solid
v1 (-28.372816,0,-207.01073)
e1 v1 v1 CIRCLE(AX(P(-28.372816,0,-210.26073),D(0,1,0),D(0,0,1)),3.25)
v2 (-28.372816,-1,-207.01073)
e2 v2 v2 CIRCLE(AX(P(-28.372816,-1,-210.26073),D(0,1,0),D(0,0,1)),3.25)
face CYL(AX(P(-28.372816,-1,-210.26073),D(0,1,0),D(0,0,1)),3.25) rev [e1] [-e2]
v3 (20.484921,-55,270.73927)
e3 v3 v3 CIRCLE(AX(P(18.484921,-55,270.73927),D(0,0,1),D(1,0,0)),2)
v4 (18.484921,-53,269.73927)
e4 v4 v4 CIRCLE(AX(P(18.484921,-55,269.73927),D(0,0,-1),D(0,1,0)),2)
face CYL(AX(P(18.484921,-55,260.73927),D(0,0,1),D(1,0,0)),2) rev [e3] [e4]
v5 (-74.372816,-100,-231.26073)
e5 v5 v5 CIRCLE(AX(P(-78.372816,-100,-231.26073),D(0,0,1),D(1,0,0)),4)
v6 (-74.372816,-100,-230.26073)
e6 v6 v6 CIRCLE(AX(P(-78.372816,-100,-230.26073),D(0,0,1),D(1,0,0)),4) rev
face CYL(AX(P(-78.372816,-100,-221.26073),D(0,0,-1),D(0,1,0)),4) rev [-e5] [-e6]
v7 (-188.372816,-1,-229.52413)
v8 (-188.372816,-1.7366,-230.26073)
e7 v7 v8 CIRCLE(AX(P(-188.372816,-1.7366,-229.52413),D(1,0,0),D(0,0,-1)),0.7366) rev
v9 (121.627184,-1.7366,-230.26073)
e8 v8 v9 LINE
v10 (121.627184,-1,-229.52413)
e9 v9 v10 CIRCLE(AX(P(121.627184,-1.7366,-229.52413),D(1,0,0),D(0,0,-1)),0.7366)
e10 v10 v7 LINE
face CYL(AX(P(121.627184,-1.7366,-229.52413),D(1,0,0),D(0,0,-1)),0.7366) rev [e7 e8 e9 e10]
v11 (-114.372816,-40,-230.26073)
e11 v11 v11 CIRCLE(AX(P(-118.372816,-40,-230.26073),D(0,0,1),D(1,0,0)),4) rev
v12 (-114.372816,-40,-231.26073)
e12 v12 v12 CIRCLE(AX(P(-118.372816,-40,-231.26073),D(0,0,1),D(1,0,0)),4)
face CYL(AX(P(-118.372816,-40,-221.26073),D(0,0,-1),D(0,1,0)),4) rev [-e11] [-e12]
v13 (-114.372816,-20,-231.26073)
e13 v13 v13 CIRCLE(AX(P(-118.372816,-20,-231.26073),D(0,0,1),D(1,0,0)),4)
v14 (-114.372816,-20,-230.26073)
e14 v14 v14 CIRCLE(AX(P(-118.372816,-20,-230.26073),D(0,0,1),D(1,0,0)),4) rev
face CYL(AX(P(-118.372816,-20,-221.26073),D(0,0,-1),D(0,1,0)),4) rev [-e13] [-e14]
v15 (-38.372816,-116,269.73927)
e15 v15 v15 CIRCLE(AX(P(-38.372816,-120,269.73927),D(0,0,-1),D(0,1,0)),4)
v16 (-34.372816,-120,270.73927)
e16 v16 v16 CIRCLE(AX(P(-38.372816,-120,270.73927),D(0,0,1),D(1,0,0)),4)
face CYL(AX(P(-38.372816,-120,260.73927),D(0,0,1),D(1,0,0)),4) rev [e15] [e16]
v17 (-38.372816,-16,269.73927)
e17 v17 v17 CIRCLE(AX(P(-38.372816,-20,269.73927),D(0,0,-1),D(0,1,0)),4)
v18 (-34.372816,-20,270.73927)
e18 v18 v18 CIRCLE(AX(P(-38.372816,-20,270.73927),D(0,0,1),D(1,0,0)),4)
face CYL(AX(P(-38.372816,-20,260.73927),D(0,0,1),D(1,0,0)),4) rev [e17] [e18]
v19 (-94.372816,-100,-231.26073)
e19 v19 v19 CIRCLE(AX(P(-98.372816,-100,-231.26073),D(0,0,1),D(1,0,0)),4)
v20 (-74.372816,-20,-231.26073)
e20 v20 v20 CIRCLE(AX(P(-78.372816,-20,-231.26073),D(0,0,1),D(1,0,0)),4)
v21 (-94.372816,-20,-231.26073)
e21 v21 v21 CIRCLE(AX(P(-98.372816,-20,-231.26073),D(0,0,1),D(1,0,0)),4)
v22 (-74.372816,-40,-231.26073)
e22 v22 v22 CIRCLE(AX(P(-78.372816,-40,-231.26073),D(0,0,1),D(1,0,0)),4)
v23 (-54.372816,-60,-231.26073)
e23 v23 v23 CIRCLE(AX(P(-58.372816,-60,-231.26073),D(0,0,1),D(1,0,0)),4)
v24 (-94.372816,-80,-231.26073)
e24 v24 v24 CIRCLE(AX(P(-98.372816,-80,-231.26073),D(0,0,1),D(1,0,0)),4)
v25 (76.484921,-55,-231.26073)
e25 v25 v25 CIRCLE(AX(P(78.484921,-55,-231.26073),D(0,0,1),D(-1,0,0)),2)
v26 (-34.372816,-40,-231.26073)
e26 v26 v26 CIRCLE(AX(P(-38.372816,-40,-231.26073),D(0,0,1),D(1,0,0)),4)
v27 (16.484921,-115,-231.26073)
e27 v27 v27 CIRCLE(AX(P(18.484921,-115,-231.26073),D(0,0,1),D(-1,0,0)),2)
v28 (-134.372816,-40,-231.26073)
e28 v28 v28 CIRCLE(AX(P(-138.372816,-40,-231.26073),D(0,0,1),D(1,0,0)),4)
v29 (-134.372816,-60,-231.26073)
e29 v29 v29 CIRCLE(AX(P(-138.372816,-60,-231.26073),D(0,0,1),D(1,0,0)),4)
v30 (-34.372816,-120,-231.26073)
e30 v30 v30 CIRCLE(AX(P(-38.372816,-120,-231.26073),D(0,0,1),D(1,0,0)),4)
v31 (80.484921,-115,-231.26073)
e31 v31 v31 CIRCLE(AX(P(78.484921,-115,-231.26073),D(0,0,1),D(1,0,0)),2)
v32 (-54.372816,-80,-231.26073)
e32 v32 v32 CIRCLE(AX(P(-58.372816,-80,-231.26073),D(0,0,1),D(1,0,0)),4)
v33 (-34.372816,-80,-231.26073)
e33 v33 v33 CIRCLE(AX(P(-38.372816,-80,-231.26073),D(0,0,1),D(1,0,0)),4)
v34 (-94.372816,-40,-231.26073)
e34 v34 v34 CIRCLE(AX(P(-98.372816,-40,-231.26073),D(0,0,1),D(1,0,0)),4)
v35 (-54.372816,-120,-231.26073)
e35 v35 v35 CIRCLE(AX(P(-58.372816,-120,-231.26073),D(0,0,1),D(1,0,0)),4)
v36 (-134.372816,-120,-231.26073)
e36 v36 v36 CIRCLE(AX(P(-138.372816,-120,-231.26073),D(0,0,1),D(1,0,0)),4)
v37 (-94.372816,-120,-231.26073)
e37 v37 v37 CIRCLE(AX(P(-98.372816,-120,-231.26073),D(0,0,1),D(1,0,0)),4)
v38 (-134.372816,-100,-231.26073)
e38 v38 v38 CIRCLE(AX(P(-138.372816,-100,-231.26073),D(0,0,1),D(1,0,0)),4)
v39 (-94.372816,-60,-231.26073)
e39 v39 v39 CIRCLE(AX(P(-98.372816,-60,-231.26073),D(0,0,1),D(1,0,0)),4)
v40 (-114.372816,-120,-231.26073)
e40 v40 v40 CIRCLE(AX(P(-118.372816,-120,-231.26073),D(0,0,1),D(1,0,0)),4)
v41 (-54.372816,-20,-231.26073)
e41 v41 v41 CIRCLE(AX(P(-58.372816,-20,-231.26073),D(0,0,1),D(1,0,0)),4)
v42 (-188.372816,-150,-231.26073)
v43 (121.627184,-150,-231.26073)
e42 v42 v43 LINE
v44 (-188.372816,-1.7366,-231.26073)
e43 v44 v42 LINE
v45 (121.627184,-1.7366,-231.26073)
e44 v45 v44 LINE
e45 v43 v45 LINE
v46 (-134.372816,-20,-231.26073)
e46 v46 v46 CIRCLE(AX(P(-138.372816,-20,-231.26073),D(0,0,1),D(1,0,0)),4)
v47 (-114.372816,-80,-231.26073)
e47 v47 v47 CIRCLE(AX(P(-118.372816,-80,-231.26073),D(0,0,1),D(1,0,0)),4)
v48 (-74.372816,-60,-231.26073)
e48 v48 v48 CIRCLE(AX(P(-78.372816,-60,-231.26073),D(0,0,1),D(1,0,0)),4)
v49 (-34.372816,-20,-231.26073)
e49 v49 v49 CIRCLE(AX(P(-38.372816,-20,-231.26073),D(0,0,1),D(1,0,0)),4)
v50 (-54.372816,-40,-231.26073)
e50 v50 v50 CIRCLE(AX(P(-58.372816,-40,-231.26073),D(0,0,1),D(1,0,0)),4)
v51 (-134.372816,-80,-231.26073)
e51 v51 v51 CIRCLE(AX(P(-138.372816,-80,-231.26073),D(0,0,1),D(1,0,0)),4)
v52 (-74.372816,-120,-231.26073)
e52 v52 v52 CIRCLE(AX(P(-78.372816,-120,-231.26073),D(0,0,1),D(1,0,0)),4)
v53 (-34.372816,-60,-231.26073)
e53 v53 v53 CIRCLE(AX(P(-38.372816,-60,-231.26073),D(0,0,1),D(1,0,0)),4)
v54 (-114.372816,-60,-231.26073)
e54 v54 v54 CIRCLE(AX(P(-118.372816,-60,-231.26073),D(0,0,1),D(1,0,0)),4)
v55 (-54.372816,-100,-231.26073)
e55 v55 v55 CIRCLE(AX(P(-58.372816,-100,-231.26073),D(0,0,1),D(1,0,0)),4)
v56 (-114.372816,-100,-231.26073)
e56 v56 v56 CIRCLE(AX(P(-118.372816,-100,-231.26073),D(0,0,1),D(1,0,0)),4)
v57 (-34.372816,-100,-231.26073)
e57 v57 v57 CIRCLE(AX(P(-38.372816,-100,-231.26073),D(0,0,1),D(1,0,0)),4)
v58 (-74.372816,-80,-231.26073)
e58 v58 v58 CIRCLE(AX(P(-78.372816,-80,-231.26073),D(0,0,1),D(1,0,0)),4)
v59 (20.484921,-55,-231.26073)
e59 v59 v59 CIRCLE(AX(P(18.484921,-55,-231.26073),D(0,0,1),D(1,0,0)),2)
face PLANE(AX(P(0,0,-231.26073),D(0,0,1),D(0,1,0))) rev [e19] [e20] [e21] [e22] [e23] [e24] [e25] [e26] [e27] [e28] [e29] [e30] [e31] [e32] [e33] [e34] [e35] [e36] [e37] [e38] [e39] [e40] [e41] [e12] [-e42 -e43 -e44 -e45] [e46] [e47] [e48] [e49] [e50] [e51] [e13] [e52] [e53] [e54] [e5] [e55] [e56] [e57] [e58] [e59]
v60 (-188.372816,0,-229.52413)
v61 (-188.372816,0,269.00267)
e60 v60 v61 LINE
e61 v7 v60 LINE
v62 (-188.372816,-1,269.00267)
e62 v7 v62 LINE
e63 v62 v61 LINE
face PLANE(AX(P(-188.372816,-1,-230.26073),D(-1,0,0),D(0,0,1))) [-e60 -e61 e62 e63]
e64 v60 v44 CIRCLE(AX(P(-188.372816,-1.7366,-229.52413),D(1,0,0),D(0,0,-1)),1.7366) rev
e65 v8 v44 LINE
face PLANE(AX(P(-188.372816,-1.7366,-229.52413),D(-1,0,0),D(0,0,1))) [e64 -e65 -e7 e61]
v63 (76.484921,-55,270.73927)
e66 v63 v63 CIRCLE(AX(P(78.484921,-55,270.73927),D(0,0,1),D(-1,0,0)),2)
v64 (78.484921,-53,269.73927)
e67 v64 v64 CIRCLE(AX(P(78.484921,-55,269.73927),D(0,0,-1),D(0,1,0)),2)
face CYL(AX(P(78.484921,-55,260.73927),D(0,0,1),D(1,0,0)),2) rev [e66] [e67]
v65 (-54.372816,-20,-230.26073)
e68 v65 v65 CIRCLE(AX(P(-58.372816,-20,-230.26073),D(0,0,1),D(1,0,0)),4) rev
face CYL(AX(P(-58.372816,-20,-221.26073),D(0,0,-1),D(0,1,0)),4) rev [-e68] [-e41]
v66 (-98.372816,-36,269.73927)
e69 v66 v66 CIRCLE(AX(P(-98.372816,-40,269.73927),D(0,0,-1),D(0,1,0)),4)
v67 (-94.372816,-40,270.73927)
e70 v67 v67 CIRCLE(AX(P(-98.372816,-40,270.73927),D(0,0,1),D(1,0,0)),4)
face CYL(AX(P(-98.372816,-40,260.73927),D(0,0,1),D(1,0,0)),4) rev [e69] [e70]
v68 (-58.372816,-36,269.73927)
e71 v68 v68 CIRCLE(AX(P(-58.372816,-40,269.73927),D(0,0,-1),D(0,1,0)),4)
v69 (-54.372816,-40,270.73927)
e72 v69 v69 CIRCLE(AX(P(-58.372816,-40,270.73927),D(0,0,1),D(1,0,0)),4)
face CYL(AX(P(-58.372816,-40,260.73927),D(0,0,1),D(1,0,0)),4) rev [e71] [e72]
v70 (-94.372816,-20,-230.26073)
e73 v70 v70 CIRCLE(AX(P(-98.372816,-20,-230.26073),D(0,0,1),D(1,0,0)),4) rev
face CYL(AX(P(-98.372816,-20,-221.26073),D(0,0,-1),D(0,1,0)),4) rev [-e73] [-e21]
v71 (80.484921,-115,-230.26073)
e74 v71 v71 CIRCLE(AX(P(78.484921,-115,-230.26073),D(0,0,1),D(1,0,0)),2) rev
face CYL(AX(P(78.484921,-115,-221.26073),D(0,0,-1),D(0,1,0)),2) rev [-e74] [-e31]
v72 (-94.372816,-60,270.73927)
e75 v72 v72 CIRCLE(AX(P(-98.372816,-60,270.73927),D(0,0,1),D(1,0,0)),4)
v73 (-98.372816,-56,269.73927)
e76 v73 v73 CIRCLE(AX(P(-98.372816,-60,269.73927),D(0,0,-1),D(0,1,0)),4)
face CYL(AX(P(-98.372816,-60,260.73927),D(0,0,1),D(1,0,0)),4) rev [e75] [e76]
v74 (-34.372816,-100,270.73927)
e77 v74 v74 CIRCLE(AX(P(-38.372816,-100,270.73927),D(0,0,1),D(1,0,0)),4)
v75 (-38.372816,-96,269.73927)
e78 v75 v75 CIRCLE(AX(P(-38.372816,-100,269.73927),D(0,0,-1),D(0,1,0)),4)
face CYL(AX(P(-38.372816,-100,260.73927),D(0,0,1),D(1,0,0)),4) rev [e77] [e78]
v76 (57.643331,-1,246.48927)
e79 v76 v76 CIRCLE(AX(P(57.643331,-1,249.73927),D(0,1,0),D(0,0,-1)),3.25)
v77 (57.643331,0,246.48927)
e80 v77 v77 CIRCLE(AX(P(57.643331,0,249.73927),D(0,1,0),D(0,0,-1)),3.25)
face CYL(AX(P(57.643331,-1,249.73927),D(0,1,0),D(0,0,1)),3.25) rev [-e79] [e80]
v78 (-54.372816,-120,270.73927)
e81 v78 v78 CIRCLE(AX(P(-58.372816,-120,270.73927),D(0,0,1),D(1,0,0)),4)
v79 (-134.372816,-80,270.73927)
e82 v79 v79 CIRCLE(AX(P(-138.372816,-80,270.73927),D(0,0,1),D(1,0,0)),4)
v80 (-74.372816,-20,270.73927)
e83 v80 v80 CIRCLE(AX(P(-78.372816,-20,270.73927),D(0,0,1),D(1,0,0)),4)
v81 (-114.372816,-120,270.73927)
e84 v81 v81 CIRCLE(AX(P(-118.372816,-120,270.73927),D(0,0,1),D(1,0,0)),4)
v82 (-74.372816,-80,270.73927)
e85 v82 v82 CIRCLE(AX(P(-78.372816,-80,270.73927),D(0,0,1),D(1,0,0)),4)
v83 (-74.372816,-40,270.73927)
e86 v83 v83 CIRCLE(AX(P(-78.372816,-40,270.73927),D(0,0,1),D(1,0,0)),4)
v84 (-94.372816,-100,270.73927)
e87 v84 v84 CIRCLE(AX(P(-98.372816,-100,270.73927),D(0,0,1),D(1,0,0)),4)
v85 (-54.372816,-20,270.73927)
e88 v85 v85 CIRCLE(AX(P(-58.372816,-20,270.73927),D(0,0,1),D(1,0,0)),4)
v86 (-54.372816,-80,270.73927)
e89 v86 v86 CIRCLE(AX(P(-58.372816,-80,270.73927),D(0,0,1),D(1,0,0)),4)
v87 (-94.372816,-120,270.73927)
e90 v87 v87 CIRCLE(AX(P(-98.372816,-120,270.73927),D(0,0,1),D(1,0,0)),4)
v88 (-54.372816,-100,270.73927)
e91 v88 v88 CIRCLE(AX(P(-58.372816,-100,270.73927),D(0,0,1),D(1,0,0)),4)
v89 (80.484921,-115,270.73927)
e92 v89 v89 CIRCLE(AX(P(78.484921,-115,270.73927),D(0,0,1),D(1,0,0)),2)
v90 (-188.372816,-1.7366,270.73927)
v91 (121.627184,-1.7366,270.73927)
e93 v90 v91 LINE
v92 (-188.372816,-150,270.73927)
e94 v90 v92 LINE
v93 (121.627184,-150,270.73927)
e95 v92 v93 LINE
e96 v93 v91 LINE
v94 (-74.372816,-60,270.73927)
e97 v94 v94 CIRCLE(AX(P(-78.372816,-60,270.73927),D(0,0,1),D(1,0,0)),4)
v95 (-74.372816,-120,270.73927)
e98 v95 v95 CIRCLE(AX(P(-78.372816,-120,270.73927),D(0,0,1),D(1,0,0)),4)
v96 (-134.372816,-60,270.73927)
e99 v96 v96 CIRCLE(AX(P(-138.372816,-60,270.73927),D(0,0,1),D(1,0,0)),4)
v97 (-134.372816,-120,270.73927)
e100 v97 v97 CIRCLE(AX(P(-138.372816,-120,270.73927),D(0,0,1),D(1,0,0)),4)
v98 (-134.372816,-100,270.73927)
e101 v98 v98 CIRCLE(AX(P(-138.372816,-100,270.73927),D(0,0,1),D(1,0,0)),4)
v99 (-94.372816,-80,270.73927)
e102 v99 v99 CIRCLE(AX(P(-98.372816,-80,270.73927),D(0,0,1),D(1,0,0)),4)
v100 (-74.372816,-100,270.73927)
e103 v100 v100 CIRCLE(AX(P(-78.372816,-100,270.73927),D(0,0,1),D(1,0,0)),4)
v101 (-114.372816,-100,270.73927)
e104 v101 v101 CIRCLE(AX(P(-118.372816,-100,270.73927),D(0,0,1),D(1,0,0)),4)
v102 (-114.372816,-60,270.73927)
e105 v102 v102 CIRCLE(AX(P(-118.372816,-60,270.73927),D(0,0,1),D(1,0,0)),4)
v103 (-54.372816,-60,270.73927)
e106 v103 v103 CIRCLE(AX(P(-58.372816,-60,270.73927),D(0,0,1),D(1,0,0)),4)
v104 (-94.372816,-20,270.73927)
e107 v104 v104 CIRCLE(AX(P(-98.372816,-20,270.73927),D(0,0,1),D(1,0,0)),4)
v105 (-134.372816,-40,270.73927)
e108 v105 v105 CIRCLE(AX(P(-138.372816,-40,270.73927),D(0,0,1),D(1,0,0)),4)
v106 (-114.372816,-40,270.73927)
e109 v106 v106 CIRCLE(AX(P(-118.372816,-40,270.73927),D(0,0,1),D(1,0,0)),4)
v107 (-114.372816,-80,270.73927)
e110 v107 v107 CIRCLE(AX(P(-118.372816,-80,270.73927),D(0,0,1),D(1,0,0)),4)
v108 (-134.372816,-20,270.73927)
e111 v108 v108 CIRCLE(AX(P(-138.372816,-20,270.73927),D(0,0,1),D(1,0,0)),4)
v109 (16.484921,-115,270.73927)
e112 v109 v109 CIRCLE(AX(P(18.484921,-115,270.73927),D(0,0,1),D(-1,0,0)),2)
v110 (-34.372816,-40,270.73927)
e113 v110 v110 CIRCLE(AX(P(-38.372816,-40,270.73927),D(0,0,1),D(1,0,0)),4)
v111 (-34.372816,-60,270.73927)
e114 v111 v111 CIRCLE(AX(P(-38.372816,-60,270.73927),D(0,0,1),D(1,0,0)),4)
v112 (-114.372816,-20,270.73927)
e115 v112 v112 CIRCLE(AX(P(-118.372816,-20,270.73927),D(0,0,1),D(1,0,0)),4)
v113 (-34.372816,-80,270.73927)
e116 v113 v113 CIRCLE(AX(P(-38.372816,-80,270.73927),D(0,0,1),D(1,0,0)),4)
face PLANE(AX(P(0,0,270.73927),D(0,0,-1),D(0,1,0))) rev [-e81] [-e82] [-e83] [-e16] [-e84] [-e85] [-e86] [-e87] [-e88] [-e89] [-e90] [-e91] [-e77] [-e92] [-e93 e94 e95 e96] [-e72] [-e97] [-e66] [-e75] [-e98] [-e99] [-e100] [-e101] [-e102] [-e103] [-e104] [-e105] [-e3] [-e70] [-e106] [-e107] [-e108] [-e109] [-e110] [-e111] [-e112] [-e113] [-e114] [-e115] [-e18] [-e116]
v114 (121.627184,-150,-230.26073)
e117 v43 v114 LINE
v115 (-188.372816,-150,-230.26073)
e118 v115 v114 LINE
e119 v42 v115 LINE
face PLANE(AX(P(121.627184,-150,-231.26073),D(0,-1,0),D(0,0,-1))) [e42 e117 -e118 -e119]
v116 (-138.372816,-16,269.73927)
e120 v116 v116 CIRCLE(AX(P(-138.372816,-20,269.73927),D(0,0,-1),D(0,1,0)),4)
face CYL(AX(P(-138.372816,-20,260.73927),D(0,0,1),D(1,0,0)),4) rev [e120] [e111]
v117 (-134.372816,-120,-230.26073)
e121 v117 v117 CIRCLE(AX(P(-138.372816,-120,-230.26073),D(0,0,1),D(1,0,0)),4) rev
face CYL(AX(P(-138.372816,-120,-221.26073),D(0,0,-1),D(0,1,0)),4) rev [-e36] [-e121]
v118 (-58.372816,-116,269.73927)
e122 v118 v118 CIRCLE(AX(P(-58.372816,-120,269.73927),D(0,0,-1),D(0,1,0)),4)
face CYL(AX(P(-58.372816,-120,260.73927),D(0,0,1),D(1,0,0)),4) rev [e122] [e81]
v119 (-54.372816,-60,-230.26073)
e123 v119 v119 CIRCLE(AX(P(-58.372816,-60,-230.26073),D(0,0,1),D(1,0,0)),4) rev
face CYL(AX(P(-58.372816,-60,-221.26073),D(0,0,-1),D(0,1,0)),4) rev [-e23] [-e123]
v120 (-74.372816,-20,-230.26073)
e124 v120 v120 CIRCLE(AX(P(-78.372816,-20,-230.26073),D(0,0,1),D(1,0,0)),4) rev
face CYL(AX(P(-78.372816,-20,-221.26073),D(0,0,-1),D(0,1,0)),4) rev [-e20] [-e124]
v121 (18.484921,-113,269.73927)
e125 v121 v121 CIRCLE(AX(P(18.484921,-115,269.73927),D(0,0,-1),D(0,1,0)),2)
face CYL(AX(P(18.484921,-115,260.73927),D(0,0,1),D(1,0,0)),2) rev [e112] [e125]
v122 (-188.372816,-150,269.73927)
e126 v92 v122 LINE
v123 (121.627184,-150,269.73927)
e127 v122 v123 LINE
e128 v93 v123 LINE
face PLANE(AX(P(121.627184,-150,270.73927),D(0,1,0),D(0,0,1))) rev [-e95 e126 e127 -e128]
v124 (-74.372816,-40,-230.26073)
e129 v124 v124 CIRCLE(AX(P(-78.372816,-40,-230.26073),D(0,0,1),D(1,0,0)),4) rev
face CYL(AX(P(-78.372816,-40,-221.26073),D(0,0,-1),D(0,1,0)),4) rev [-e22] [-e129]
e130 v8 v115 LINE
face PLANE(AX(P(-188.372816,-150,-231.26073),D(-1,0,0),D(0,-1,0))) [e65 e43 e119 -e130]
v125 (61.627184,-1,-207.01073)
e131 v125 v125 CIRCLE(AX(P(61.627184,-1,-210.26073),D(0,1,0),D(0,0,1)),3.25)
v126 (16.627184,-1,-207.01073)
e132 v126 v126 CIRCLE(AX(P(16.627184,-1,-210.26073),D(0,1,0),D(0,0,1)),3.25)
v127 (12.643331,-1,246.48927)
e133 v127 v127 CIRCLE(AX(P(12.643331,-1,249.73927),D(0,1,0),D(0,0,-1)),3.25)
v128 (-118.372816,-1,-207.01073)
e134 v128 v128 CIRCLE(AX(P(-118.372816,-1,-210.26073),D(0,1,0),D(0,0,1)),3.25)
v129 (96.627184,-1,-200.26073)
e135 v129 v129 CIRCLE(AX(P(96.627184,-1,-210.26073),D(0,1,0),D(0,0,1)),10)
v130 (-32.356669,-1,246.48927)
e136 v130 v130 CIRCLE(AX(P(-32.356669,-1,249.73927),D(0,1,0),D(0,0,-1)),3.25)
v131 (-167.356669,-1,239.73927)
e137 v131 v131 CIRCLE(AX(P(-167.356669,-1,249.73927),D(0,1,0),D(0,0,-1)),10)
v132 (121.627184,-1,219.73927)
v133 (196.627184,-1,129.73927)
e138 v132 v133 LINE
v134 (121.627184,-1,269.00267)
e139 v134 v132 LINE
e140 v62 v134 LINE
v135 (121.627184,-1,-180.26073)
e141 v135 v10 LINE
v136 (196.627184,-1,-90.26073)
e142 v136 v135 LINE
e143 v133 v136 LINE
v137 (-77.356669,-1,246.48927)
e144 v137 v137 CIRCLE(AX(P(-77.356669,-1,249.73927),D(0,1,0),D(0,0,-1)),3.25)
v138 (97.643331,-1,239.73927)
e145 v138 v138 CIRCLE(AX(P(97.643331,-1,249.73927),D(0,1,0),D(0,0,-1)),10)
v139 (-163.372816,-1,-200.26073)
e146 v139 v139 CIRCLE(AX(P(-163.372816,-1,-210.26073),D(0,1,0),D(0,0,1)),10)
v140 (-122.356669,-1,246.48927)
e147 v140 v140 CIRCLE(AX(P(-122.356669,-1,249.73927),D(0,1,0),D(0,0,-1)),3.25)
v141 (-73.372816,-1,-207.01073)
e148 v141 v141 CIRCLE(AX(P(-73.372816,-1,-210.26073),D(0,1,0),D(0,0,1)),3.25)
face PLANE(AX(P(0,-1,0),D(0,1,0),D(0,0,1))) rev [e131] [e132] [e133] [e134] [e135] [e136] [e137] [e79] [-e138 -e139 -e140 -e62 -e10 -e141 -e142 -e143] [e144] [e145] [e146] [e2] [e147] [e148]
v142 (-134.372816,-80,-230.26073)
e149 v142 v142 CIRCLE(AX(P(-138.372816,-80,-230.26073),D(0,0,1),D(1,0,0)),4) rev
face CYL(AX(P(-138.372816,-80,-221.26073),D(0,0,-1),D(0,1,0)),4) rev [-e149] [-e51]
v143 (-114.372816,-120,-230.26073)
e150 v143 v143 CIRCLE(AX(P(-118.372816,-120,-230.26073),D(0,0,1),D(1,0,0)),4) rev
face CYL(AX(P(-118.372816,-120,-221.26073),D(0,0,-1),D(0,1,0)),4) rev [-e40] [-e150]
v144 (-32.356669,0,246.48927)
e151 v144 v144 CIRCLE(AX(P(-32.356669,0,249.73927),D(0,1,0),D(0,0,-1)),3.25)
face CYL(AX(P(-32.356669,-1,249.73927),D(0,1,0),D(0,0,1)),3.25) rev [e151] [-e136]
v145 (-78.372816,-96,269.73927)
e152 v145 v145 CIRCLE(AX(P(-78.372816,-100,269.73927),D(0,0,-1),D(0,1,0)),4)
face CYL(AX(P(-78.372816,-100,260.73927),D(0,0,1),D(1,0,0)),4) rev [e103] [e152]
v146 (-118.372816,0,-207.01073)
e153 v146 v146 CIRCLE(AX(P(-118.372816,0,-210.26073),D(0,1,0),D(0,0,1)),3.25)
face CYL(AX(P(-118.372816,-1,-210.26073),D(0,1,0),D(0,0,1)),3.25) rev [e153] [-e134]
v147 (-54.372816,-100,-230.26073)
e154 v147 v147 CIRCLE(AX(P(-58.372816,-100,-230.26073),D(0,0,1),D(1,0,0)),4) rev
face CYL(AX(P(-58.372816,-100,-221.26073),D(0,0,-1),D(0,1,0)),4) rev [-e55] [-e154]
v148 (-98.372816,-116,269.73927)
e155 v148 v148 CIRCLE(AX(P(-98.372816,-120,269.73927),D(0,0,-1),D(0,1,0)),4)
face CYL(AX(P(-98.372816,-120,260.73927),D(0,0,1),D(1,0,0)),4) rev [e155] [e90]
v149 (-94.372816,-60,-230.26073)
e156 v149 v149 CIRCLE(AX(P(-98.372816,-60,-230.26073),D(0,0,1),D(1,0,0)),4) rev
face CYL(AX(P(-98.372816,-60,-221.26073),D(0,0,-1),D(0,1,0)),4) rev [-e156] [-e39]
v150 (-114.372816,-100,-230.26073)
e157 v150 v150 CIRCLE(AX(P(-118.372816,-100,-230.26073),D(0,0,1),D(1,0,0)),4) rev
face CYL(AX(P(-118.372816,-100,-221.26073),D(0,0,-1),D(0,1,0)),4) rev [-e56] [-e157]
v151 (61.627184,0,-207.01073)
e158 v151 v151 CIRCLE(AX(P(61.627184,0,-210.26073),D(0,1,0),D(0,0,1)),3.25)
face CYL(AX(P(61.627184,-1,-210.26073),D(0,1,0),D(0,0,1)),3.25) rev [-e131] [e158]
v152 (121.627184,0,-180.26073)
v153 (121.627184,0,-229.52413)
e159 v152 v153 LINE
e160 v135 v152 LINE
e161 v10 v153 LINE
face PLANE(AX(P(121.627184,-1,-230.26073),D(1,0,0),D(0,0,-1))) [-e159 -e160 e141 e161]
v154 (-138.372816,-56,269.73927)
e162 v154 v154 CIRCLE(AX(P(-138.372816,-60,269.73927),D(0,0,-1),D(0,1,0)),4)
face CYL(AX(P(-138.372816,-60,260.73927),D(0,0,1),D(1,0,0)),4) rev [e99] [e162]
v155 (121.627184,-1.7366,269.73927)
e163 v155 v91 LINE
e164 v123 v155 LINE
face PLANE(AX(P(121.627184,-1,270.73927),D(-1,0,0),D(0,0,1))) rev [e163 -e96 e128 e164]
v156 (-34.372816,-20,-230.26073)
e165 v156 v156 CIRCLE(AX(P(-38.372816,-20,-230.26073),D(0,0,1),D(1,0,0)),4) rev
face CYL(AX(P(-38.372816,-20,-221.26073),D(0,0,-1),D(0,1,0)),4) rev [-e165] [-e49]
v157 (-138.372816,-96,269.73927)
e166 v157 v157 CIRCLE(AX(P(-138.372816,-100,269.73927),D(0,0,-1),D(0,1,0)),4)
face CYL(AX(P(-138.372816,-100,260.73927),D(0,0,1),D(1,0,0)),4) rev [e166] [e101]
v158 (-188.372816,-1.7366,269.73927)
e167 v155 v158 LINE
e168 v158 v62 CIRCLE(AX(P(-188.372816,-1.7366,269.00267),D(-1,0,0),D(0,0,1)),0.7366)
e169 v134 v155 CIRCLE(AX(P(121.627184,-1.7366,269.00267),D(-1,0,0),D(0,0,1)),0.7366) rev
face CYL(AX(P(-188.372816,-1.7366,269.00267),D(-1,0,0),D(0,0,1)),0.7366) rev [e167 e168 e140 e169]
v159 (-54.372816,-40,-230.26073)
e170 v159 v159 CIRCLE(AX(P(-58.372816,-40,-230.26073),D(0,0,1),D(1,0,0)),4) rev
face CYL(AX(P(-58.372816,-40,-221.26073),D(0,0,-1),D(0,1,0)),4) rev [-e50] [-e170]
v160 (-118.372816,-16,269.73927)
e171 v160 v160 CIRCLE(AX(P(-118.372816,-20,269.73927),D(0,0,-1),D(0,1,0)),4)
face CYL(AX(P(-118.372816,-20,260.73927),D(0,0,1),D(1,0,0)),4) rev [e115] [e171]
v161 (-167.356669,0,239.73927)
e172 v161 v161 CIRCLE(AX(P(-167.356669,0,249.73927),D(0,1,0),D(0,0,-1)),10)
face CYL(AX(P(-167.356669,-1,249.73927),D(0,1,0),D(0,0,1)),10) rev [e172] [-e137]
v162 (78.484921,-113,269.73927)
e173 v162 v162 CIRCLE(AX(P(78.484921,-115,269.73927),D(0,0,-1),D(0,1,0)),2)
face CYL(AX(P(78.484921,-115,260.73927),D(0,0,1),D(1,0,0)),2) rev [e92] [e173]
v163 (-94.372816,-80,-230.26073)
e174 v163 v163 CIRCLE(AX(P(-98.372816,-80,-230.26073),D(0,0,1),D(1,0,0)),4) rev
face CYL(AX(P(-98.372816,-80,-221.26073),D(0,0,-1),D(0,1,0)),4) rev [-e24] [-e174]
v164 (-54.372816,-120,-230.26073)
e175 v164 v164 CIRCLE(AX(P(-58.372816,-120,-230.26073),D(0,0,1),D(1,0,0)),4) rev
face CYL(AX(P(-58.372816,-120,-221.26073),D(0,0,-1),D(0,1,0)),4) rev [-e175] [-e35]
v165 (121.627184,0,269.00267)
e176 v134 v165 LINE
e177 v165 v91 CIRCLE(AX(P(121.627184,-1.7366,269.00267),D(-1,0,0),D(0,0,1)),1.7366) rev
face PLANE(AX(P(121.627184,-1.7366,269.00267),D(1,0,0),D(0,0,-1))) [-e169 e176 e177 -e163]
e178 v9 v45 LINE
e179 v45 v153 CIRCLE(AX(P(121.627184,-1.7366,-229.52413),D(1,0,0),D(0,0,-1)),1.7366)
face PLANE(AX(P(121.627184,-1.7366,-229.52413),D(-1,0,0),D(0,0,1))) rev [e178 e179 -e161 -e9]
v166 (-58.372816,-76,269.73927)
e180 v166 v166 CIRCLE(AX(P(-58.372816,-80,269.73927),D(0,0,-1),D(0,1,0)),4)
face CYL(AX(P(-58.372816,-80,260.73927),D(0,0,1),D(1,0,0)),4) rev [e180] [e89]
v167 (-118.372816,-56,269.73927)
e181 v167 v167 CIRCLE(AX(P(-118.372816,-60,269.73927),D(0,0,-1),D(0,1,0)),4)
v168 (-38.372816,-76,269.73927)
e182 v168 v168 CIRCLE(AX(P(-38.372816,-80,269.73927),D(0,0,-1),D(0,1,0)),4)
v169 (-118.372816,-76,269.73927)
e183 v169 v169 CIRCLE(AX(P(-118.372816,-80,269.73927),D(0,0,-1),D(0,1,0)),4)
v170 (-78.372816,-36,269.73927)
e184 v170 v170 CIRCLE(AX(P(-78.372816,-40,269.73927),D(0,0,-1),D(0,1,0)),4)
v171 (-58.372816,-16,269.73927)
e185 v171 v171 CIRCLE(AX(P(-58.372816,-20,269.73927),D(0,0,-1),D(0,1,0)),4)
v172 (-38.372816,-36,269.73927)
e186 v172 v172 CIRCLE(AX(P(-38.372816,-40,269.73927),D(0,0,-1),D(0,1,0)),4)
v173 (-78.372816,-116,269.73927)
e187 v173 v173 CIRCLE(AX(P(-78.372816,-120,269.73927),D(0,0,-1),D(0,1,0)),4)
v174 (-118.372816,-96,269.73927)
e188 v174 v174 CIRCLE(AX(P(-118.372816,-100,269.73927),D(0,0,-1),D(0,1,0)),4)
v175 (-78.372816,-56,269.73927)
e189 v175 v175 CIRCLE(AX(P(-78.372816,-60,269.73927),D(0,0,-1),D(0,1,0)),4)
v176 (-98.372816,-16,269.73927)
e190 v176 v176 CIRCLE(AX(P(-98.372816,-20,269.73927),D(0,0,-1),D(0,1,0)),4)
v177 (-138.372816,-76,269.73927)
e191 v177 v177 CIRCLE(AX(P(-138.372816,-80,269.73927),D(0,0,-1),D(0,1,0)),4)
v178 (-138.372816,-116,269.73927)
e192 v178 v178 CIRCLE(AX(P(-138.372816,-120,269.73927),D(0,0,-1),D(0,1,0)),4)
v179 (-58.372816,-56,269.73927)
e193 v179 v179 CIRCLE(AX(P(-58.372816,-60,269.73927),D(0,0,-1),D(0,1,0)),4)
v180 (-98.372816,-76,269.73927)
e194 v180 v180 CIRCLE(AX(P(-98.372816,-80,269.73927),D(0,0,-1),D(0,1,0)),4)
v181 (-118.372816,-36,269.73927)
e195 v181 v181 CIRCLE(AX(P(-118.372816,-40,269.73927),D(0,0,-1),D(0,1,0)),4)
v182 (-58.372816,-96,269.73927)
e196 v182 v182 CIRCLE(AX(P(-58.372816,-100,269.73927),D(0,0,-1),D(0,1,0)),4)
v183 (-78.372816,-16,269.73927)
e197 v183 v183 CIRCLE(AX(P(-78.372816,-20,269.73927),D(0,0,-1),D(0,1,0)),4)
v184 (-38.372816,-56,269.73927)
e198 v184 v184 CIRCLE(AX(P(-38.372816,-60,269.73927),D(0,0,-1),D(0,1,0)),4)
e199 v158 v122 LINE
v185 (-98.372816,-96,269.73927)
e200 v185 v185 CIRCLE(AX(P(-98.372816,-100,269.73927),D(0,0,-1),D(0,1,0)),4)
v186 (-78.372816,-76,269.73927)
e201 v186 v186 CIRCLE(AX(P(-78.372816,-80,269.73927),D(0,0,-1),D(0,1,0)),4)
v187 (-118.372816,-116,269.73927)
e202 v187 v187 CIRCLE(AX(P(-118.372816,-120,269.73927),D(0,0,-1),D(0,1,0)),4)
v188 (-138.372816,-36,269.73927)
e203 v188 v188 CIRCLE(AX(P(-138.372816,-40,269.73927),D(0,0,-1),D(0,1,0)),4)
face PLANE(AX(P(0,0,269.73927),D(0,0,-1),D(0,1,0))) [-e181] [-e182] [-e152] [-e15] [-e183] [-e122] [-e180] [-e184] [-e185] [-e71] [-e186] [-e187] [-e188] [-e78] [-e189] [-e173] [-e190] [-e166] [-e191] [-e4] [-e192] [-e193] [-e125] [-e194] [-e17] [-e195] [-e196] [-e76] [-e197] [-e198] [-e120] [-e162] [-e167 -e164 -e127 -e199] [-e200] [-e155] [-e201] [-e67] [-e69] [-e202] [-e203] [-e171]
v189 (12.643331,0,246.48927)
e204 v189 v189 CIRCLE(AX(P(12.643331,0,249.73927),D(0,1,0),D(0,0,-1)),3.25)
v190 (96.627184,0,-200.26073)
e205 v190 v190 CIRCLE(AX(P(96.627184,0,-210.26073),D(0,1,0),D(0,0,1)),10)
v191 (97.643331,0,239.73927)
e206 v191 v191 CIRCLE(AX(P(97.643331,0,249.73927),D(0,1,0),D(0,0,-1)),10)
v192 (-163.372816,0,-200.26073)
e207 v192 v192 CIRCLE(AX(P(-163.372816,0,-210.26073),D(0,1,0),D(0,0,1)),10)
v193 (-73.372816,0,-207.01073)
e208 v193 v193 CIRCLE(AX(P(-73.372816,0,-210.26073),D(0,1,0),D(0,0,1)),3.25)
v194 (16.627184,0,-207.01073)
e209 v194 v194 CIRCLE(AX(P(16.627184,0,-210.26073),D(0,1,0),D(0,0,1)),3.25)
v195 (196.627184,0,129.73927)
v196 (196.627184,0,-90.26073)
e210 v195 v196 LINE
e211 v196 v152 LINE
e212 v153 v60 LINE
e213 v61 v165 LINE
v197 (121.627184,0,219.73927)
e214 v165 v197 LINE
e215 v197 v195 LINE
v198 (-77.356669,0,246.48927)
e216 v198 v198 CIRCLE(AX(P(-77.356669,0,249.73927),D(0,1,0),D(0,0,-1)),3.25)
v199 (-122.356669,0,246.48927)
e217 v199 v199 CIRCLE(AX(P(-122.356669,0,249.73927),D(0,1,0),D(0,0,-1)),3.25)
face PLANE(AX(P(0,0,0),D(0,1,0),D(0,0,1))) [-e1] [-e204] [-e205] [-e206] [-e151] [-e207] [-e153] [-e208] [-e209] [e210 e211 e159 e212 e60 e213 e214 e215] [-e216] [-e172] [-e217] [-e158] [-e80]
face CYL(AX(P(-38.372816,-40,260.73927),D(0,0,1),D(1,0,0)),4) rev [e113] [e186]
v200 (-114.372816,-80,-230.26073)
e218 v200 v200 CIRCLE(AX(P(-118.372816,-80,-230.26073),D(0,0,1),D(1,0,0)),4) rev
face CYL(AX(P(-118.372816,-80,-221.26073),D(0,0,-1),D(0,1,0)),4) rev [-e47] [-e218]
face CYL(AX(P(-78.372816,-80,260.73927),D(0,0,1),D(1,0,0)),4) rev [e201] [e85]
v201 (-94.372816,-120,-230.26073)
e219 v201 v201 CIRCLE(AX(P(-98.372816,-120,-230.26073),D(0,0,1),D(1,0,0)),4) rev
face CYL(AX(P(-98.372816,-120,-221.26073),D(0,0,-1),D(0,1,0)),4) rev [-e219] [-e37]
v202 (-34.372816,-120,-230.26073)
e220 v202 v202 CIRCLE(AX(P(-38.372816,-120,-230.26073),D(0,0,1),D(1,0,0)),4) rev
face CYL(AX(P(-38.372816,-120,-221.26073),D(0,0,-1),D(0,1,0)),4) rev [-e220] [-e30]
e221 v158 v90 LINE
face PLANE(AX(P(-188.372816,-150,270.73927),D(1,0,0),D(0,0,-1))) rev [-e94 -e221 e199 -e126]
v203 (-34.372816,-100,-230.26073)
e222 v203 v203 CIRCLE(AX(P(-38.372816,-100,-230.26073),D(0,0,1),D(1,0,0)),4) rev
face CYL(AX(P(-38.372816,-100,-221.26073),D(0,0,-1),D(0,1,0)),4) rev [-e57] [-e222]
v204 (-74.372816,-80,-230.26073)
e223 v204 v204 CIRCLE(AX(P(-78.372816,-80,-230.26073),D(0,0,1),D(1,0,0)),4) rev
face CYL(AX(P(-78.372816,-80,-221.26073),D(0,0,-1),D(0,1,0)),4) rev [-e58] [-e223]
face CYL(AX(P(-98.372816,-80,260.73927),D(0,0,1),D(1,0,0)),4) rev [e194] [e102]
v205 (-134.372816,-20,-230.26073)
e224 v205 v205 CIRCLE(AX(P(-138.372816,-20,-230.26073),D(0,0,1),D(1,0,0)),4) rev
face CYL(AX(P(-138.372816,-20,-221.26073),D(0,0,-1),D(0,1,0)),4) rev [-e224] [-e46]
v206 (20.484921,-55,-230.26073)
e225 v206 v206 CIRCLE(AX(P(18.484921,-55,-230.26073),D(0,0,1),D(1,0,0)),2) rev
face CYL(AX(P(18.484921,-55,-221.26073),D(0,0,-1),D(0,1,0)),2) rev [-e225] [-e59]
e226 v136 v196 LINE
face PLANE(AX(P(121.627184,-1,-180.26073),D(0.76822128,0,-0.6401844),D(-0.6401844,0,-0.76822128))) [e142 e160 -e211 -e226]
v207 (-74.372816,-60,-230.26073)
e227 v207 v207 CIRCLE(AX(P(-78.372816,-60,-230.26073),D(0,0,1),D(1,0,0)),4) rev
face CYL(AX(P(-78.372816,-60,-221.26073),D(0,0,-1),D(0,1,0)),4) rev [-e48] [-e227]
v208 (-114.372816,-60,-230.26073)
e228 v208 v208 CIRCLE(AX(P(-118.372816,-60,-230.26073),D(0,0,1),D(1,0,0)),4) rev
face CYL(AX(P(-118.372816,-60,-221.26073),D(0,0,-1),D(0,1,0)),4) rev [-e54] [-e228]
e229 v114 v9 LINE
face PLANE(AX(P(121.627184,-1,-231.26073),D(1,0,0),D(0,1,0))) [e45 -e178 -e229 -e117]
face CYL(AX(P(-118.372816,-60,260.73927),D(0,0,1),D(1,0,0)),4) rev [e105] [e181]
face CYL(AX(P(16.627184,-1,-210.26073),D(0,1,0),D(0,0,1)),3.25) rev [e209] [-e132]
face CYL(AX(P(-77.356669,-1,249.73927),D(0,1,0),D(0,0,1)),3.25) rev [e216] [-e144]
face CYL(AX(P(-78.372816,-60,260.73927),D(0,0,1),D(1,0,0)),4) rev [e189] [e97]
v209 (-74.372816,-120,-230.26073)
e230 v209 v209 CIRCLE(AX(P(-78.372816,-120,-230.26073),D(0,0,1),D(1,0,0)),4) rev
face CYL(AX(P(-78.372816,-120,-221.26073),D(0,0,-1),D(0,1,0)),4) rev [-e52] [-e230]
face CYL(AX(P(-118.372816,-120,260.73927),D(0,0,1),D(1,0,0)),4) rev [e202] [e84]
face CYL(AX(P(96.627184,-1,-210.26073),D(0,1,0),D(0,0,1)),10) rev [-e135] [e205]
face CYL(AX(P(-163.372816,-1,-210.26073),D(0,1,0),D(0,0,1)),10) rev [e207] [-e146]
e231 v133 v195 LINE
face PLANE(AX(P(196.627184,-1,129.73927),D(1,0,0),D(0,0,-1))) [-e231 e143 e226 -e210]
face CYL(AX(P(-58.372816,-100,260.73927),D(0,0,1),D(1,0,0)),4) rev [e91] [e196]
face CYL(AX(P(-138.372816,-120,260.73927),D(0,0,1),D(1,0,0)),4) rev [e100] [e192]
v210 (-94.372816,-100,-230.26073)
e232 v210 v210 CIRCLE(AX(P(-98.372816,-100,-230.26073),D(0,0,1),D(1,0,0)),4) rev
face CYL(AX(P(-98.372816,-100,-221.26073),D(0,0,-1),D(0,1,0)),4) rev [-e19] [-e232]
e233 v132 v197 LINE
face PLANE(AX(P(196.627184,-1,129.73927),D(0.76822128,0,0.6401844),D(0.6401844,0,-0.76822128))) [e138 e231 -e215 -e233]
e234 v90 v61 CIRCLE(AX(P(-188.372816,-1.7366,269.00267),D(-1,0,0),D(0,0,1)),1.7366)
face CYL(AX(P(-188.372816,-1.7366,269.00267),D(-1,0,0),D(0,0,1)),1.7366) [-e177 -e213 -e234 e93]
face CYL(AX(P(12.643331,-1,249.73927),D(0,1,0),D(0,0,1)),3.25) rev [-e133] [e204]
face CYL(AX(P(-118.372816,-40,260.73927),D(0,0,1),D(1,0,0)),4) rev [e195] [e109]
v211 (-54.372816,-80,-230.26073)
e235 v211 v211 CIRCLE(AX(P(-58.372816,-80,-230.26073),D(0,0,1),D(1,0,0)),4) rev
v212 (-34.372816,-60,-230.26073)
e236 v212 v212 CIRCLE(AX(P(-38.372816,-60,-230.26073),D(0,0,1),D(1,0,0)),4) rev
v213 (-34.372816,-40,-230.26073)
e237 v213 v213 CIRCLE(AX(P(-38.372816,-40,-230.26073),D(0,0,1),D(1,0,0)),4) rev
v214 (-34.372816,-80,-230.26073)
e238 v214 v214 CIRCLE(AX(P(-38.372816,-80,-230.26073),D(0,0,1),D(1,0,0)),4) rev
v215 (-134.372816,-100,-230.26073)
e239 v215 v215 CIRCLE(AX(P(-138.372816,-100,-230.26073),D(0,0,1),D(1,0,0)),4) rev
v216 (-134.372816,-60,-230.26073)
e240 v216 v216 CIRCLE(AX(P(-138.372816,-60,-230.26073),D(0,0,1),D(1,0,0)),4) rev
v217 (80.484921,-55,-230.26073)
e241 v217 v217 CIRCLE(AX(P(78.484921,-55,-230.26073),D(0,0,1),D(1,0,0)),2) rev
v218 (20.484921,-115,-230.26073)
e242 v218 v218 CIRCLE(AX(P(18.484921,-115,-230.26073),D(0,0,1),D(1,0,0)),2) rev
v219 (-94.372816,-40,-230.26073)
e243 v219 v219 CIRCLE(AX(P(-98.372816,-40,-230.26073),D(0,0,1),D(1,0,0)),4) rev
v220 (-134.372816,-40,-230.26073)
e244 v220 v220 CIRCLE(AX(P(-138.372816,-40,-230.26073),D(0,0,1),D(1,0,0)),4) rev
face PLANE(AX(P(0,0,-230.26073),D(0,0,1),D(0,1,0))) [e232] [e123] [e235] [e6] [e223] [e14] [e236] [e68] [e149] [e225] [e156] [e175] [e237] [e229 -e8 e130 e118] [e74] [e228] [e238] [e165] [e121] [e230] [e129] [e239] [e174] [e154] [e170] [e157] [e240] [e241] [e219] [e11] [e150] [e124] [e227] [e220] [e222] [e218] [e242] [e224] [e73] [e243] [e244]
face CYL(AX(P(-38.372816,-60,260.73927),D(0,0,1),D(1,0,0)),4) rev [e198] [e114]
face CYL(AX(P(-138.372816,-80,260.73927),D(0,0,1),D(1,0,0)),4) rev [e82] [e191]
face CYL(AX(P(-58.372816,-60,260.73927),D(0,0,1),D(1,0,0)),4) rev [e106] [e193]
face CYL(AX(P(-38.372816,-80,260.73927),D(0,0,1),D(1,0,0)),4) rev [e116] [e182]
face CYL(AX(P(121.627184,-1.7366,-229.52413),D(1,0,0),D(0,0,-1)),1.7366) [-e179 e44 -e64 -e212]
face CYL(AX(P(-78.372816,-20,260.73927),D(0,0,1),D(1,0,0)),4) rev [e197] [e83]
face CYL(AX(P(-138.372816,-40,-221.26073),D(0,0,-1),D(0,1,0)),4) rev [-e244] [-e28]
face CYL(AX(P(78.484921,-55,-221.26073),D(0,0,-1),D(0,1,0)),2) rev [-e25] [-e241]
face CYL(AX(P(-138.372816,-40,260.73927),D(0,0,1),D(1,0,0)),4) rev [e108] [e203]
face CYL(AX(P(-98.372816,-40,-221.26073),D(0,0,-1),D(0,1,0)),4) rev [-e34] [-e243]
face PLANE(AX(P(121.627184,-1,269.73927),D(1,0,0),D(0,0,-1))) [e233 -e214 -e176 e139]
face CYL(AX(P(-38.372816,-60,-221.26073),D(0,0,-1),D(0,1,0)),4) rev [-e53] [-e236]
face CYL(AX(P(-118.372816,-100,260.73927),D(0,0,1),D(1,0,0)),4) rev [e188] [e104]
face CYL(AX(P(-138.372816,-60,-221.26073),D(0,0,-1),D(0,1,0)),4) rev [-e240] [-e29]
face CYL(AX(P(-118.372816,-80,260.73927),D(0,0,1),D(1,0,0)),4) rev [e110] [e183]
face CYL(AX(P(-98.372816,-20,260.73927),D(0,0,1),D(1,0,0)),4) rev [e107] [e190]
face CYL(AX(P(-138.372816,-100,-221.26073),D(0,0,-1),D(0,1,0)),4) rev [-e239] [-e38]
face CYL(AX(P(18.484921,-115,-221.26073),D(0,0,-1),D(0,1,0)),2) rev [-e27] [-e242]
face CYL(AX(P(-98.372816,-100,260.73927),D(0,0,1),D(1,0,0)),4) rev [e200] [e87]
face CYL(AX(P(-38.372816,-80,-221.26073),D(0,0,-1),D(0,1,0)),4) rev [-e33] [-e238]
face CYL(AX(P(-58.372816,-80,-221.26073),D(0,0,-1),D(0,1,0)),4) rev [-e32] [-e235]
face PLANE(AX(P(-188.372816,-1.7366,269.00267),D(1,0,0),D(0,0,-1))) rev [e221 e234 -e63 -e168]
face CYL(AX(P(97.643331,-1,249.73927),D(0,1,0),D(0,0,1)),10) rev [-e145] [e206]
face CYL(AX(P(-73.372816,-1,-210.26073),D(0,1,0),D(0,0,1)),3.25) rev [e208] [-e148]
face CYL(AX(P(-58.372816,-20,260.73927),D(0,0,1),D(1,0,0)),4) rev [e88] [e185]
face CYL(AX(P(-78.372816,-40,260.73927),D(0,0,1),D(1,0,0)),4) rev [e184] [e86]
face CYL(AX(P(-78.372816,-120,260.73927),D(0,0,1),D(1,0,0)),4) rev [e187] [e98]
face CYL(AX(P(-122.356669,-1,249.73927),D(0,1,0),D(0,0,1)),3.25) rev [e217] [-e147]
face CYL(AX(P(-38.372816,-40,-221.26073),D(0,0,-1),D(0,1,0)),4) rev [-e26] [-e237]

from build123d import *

# Parameters (mm, degrees)
SKETCH6_R                    = 10
SKETCH6_R_2                  = 3.25
BASE_FLANGE2_DEPTH           = 1
EDGE_FLANGE1_STRIP_W         = 5.4732
EDGE_FLANGE1_STRIP_H         = 1
EDGE_FLANGE1_STRIP_CUT_DEPTH = 310
EDGE_FLANGE1_DEPTH           = 310
SKETCH23_R                   = 4
CUT_EXTRUDE1_DEPTH           = 10
SKETCH24_R                   = 2
CUT_EXTRUDE2_DEPTH           = 10


# Sheet-metal steps are written as plain solids
with BuildPart() as part:
    # Sketch6 → Base-Flange2 (new body)
    with BuildSketch(Plane(origin=(0, 0, 0), x_dir=(1, 0, 0), z_dir=(0, 1, 0))):
        Polygon((-188.372816417, 230.260729543), (-188.372816417, -269.739270457), (121.627183583, -269.739270457), (121.627183583, -219.739270457), (196.627183583, -129.739270457), (196.627183583, 90.260729543), (121.627183583, 180.260729543), (121.627183583, 230.260729543), align=None)
        with Locations(Location((-163.372816417, 210.260729543, 0), (0, 0, 270))):
            Circle(SKETCH6_R, mode=Mode.SUBTRACT)
        with Locations(Location((-118.372816417, 210.260729543, 0), (0, 0, 270))):
            Circle(SKETCH6_R_2, mode=Mode.SUBTRACT)
        with Locations(Location((-73.372816417, 210.260729543, 0), (0, 0, 270))):
            Circle(SKETCH6_R_2, mode=Mode.SUBTRACT)
        with Locations(Location((-28.372816417, 210.260729543, 0), (0, 0, 270))):
            Circle(SKETCH6_R_2, mode=Mode.SUBTRACT)
        with Locations(Location((16.627183583, 210.260729543, 0), (0, 0, 270))):
            Circle(SKETCH6_R_2, mode=Mode.SUBTRACT)
        with Locations(Location((96.627183583, 210.260729543, 0), (0, 0, 270))):
            Circle(SKETCH6_R, mode=Mode.SUBTRACT)
        with Locations(Location((61.627183583, 210.260729543, 0), (0, 0, 270))):
            Circle(SKETCH6_R_2, mode=Mode.SUBTRACT)
        with Locations(Location((-167.356668965, -249.739270457, 0), (0, 0, 90))):
            Circle(SKETCH6_R, mode=Mode.SUBTRACT)
        with Locations(Location((-122.356668965, -249.739270457, 0), (0, 0, 90))):
            Circle(SKETCH6_R_2, mode=Mode.SUBTRACT)
        with Locations(Location((-77.356668965, -249.739270457, 0), (0, 0, 90))):
            Circle(SKETCH6_R_2, mode=Mode.SUBTRACT)
        with Locations(Location((-32.356668965, -249.739270457, 0), (0, 0, 90))):
            Circle(SKETCH6_R_2, mode=Mode.SUBTRACT)
        with Locations(Location((12.643331035, -249.739270457, 0), (0, 0, 90))):
            Circle(SKETCH6_R_2, mode=Mode.SUBTRACT)
        with Locations(Location((97.643331035, -249.739270457, 0), (0, 0, 90))):
            Circle(SKETCH6_R, mode=Mode.SUBTRACT)
        with Locations(Location((57.643331035, -249.739270457, 0), (0, 0, 90))):
            Circle(SKETCH6_R_2, mode=Mode.SUBTRACT)
    extrude(amount=-BASE_FLANGE2_DEPTH)

    # Edge-Flange1 strip (across the edge) → Edge-Flange1 strip cut (cut)
    with BuildSketch(Plane(origin=(121.627183583, -1, 269.739270457), x_dir=(0, 0, -1), z_dir=(-1, 0, 0))):
        with Locations((-2, -0.5)):
            Rectangle(EDGE_FLANGE1_STRIP_W, EDGE_FLANGE1_STRIP_H)
    edge_flange1_strip_cut = extrude(amount=EDGE_FLANGE1_STRIP_CUT_DEPTH, mode=Mode.SUBTRACT)

    # Edge-Flange1 section (across the edge) → Edge-Flange1 (add)
    with BuildSketch(Plane(origin=(121.627183583, -1, 269.739270457), x_dir=(0, 0, -1), z_dir=(-1, 0, 0))):
        with BuildLine():
            Line((-1, 0.7366), (-1, 149))
            Line((-1, 149), (0, 149))
            Line((0, 149), (0, 0.7366))
            ThreePointArc((0, 0.7366), (0.215745145, 0.215745145), (0.7366, 0))
            Line((0.7366, 0), (0.7366, -1))
            ThreePointArc((0.7366, -1), (-0.491361636, -0.491361636), (-1, 0.7366))
        make_face()
    edge_flange1 = extrude(amount=EDGE_FLANGE1_DEPTH)

    # Sketch23 → Cut-Extrude1 (cut)
    with BuildSketch(Plane.XY.offset(270.739270457)):
        with Locations((-138.372816417, -120)):
            Circle(SKETCH23_R)
        with Locations((-118.372816417, -120)):
            Circle(SKETCH23_R)
        with Locations((-98.372816417, -120)):
            Circle(SKETCH23_R)
        with Locations((-78.372816417, -120)):
            Circle(SKETCH23_R)
        with Locations((-58.372816417, -120)):
            Circle(SKETCH23_R)
        with Locations((-38.372816417, -120)):
            Circle(SKETCH23_R)
        with Locations((-118.372816417, -100)):
            Circle(SKETCH23_R)
        with Locations((-98.372816417, -100)):
            Circle(SKETCH23_R)
        with Locations((-78.372816417, -100)):
            Circle(SKETCH23_R)
        with Locations((-58.372816417, -100)):
            Circle(SKETCH23_R)
        with Locations((-38.372816417, -100)):
            Circle(SKETCH23_R)
        with Locations((-118.372816417, -80)):
            Circle(SKETCH23_R)
        with Locations((-98.372816417, -80)):
            Circle(SKETCH23_R)
        with Locations((-78.372816417, -80)):
            Circle(SKETCH23_R)
        with Locations((-58.372816417, -80)):
            Circle(SKETCH23_R)
        with Locations((-38.372816417, -80)):
            Circle(SKETCH23_R)
        with Locations((-118.372816417, -60)):
            Circle(SKETCH23_R)
        with Locations((-98.372816417, -60)):
            Circle(SKETCH23_R)
        with Locations((-78.372816417, -60)):
            Circle(SKETCH23_R)
        with Locations((-58.372816417, -60)):
            Circle(SKETCH23_R)
        with Locations((-38.372816417, -60)):
            Circle(SKETCH23_R)
        with Locations((-118.372816417, -40)):
            Circle(SKETCH23_R)
        with Locations((-98.372816417, -40)):
            Circle(SKETCH23_R)
        with Locations((-78.372816417, -40)):
            Circle(SKETCH23_R)
        with Locations((-58.372816417, -40)):
            Circle(SKETCH23_R)
        with Locations((-38.372816417, -40)):
            Circle(SKETCH23_R)
        with Locations((-118.372816417, -20)):
            Circle(SKETCH23_R)
        with Locations((-98.372816417, -20)):
            Circle(SKETCH23_R)
        with Locations((-78.372816417, -20)):
            Circle(SKETCH23_R)
        with Locations((-58.372816417, -20)):
            Circle(SKETCH23_R)
        with Locations((-38.372816417, -20)):
            Circle(SKETCH23_R)
        with Locations((-138.372816417, -100)):
            Circle(SKETCH23_R)
        with Locations((-138.372816417, -80)):
            Circle(SKETCH23_R)
        with Locations((-138.372816417, -60)):
            Circle(SKETCH23_R)
        with Locations((-138.372816417, -40)):
            Circle(SKETCH23_R)
        with Locations((-138.372816417, -20)):
            Circle(SKETCH23_R)
    cut_extrude1 = extrude(amount=-CUT_EXTRUDE1_DEPTH, mode=Mode.SUBTRACT)

    # Sketch24 → Cut-Extrude2 (cut)
    with BuildSketch(Plane.XY.offset(270.739270457)):
        with Locations((18.484920525, -55)):
            Circle(SKETCH24_R)
        with Locations(Location((78.484920525, -55, 0), (0, 0, 90))):
            Circle(SKETCH24_R)
        with Locations((78.484920525, -115)):
            Circle(SKETCH24_R)
        with Locations(Location((18.484920525, -115, 0), (0, 0, 90))):
            Circle(SKETCH24_R)
    cut_extrude2 = extrude(amount=-CUT_EXTRUDE2_DEPTH, mode=Mode.SUBTRACT)

    # Mirror2: Edge-Flange1 strip cut, Edge-Flange1, Cut-Extrude1 across plane
    add(edge_flange1_strip_cut.mirror(Plane(origin=(0, 0, 19.739270457), x_dir=(1, 0, 0), z_dir=(0, 0, -1))), mode=Mode.SUBTRACT)
    add(edge_flange1.mirror(Plane(origin=(0, 0, 19.739270457), x_dir=(1, 0, 0), z_dir=(0, 0, -1))))
    add(cut_extrude1.mirror(Plane(origin=(0, 0, 19.739270457), x_dir=(1, 0, 0), z_dir=(0, 0, -1))), mode=Mode.SUBTRACT)

    # Mirror3: Cut-Extrude2 across plane
    add(cut_extrude2.mirror(Plane(origin=(0, 0, 19.739270457), x_dir=(1, 0, 0), z_dir=(0, 0, -1))), mode=Mode.SUBTRACT)


solid = part.part
